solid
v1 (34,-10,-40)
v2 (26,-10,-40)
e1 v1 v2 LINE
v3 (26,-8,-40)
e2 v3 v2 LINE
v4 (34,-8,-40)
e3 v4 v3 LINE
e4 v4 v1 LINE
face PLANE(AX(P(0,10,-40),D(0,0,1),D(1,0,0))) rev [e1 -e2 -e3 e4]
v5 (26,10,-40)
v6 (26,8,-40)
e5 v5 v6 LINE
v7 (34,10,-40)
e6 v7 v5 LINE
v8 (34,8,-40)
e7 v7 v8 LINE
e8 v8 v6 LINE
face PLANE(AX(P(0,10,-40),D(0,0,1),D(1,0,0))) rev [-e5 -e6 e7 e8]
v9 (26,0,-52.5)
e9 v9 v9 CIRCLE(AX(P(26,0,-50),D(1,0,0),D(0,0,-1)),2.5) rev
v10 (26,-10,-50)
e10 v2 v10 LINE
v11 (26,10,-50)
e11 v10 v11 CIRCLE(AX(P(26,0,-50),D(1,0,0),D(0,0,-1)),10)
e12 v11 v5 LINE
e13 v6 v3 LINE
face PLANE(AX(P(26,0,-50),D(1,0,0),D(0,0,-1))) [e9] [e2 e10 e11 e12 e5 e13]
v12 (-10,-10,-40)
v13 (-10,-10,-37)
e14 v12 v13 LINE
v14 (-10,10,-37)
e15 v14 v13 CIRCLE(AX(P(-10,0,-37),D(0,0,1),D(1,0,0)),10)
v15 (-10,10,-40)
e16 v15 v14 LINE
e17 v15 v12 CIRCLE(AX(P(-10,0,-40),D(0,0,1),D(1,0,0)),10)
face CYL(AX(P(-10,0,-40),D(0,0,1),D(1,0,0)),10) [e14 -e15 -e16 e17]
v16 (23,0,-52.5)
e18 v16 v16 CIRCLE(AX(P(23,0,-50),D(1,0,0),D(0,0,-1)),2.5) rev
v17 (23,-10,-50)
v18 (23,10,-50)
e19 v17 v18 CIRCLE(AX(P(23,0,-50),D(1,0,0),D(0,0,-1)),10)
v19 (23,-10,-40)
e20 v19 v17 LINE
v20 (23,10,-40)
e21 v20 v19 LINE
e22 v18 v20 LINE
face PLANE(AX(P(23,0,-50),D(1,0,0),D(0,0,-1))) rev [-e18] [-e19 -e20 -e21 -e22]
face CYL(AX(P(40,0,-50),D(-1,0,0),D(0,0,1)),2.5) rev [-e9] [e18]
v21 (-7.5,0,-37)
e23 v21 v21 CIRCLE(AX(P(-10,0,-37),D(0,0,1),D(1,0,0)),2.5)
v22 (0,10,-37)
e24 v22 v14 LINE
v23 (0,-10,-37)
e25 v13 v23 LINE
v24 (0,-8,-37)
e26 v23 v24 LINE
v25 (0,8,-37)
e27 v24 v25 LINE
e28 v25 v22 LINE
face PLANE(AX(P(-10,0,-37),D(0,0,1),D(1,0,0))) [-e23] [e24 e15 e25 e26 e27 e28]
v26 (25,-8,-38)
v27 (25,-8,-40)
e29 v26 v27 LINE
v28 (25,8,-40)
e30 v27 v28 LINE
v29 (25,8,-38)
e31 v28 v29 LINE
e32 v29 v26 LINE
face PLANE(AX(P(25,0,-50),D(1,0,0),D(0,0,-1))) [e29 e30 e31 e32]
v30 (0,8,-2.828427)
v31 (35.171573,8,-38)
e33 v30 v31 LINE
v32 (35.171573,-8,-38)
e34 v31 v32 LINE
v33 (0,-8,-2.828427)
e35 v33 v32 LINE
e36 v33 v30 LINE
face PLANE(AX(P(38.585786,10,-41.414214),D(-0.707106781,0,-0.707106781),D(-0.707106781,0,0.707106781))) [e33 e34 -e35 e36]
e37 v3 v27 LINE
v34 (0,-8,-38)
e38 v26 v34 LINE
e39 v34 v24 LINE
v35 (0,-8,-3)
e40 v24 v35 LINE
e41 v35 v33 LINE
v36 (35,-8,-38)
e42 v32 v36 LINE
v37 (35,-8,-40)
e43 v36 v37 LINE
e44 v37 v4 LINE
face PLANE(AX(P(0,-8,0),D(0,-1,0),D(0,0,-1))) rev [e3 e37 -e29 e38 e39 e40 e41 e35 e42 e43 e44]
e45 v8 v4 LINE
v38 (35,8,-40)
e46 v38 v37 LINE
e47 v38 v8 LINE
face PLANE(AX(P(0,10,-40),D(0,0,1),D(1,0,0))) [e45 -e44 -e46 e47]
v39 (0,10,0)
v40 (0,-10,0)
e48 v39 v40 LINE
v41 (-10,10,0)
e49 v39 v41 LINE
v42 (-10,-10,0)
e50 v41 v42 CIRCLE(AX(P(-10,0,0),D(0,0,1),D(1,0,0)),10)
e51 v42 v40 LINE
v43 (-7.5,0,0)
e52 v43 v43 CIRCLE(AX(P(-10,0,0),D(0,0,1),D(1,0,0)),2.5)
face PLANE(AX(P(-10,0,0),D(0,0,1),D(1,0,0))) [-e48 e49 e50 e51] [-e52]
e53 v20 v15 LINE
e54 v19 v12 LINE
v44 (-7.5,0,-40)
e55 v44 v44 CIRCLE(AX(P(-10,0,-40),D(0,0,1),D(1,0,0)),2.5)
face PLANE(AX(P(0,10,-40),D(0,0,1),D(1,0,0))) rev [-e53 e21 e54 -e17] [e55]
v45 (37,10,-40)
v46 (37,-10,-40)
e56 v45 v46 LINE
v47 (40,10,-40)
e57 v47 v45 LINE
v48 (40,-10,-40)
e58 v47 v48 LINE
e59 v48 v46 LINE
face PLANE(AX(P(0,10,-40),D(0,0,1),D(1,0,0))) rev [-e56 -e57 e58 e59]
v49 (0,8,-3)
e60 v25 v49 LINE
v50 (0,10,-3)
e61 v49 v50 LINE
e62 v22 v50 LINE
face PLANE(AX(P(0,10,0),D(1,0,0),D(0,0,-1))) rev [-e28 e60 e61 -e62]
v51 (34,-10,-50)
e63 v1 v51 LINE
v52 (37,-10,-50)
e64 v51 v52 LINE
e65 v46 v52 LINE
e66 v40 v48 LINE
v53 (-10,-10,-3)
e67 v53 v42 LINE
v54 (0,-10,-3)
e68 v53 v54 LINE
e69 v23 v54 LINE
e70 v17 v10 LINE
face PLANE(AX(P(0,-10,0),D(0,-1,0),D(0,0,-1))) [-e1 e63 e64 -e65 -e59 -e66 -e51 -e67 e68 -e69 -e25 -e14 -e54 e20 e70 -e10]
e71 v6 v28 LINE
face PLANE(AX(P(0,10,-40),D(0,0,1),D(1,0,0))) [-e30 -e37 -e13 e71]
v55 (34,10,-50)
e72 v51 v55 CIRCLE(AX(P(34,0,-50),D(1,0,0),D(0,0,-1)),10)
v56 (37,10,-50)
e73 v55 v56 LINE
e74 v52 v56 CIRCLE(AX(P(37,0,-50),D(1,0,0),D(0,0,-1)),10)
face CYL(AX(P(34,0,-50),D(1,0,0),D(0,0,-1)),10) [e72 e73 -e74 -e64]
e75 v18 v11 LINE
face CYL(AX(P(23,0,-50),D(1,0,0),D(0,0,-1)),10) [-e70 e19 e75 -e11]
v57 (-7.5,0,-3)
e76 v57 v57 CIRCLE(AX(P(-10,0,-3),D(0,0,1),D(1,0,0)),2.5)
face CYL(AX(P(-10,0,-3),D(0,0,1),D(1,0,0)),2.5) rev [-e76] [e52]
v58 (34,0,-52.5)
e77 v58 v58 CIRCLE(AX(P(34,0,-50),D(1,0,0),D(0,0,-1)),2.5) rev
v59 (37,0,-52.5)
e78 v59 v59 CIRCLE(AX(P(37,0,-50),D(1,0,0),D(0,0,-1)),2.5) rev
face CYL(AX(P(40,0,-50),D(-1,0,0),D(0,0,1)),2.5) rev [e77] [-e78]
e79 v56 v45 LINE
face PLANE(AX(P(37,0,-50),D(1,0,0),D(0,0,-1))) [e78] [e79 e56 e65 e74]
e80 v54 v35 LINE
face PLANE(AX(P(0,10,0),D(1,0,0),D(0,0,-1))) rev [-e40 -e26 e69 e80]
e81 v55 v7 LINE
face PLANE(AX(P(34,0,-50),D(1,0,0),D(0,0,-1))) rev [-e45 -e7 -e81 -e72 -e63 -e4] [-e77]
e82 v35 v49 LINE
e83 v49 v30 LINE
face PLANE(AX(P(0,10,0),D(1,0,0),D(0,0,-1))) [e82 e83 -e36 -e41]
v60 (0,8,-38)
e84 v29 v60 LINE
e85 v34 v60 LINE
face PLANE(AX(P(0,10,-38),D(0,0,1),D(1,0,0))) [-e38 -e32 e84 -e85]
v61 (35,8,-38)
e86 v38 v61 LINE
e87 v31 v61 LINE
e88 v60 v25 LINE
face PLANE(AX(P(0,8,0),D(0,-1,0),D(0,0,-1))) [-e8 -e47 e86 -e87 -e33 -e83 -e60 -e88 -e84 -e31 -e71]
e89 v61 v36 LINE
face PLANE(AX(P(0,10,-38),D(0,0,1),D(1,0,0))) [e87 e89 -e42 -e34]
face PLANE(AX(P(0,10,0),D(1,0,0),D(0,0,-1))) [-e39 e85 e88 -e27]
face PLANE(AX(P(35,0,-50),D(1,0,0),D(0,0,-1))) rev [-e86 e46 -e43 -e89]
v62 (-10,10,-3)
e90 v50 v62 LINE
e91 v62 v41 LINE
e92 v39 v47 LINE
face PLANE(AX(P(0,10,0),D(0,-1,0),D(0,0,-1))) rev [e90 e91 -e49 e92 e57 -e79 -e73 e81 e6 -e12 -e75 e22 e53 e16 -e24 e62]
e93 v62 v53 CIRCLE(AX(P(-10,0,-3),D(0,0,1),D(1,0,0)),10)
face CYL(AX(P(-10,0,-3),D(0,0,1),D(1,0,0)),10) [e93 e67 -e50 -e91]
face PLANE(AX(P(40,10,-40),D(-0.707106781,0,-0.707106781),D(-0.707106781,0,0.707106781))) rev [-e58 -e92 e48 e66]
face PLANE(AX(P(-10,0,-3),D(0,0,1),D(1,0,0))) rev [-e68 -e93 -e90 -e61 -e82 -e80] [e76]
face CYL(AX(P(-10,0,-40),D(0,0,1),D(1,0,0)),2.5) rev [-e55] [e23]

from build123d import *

# Parameters (mm, degrees)
BOSS_EXTRUDE1_DEPTH = 10
BOSS_EXTRUDE2_START = 37
BOSS_EXTRUDE2_DEPTH = 3
LPATTERN1_COUNT     = 2
LPATTERN1_PITCH     = 11
SKETCH3_R           = 2.5
CUT_EXTRUDE1_DEPTH  = 40
SKETCH4_R           = 2.5
BOSS_EXTRUDE3_DEPTH = 3
LPATTERN2_COUNT     = 2
LPATTERN2_PITCH     = 37
SHELL2_START        = -8
SHELL2_DEPTH        = 16


# Read off the part's stored shape, not the designer's step: Shell2
with BuildPart() as part:
    # Sketch1 → Boss-Extrude1 (new, symmetric)
    with BuildSketch(Plane(origin=(0, 0, 0), x_dir=(1, 0, 0), z_dir=(0, 1, 0))):
        Polygon((0, 0), (0, 40), (40, 40), align=None)
    extrude(amount=BOSS_EXTRUDE1_DEPTH, both=True)

    # Sketch2 → Boss-Extrude2 (add)
    with BuildSketch(Plane(origin=(0, 0, 0), x_dir=(0, 0, -1), z_dir=(1, 0, 0)).offset(BOSS_EXTRUDE2_START)):
        with BuildLine():
            Line((40, 10), (50, 10))
            ThreePointArc((50, 10), (60, 0), (50, -10))
            Line((50, -10), (40, -10))
            Line((40, -10), (40, 10))
        make_face()
    boss_extrude2 = extrude(amount=-BOSS_EXTRUDE2_DEPTH)

    # LPattern1: Boss-Extrude2 ×2
    with Locations(*[(-i * LPATTERN1_PITCH, 0, 0) for i in range(1, LPATTERN1_COUNT)]):
        add(boss_extrude2)

    # Sketch3 → Cut-Extrude1 (cut)
    with BuildSketch(Plane(origin=(0, 0, 0), x_dir=(0, 0, -1), z_dir=(1, 0, 0))):
        with Locations((50, 0)):
            Circle(SKETCH3_R)
    extrude(amount=CUT_EXTRUDE1_DEPTH, mode=Mode.SUBTRACT)

    # Sketch4 → Boss-Extrude3 (add)
    with BuildSketch(Plane.XY):
        with BuildLine():
            Line((0, 10), (-10, 10))
            ThreePointArc((-10, 10), (-20, 0), (-10, -10))
            Line((-10, -10), (0, -10))
            Line((0, -10), (0, 10))
        make_face()
        with Locations((-10, 0)):
            Circle(SKETCH4_R, mode=Mode.SUBTRACT)
    boss_extrude3 = extrude(amount=-BOSS_EXTRUDE3_DEPTH)

    # LPattern2: Boss-Extrude3 ×2
    with Locations(*[(0, 0, -i * LPATTERN2_PITCH) for i in range(1, LPATTERN2_COUNT)]):
        add(boss_extrude3)

    # Shell2 outline → Shell2 (cut)
    with BuildSketch(Plane(origin=(0, 0, 0), x_dir=(1, 0, 0), z_dir=(0, 1, 0)).offset(SHELL2_START)):
        Polygon((35, 40), (25, 40), (25, 38), (0, 38), (0, 2.828427125), (35.171572875, 38), (35, 38), align=None)
    extrude(amount=SHELL2_DEPTH, mode=Mode.SUBTRACT)


solid = part.part
